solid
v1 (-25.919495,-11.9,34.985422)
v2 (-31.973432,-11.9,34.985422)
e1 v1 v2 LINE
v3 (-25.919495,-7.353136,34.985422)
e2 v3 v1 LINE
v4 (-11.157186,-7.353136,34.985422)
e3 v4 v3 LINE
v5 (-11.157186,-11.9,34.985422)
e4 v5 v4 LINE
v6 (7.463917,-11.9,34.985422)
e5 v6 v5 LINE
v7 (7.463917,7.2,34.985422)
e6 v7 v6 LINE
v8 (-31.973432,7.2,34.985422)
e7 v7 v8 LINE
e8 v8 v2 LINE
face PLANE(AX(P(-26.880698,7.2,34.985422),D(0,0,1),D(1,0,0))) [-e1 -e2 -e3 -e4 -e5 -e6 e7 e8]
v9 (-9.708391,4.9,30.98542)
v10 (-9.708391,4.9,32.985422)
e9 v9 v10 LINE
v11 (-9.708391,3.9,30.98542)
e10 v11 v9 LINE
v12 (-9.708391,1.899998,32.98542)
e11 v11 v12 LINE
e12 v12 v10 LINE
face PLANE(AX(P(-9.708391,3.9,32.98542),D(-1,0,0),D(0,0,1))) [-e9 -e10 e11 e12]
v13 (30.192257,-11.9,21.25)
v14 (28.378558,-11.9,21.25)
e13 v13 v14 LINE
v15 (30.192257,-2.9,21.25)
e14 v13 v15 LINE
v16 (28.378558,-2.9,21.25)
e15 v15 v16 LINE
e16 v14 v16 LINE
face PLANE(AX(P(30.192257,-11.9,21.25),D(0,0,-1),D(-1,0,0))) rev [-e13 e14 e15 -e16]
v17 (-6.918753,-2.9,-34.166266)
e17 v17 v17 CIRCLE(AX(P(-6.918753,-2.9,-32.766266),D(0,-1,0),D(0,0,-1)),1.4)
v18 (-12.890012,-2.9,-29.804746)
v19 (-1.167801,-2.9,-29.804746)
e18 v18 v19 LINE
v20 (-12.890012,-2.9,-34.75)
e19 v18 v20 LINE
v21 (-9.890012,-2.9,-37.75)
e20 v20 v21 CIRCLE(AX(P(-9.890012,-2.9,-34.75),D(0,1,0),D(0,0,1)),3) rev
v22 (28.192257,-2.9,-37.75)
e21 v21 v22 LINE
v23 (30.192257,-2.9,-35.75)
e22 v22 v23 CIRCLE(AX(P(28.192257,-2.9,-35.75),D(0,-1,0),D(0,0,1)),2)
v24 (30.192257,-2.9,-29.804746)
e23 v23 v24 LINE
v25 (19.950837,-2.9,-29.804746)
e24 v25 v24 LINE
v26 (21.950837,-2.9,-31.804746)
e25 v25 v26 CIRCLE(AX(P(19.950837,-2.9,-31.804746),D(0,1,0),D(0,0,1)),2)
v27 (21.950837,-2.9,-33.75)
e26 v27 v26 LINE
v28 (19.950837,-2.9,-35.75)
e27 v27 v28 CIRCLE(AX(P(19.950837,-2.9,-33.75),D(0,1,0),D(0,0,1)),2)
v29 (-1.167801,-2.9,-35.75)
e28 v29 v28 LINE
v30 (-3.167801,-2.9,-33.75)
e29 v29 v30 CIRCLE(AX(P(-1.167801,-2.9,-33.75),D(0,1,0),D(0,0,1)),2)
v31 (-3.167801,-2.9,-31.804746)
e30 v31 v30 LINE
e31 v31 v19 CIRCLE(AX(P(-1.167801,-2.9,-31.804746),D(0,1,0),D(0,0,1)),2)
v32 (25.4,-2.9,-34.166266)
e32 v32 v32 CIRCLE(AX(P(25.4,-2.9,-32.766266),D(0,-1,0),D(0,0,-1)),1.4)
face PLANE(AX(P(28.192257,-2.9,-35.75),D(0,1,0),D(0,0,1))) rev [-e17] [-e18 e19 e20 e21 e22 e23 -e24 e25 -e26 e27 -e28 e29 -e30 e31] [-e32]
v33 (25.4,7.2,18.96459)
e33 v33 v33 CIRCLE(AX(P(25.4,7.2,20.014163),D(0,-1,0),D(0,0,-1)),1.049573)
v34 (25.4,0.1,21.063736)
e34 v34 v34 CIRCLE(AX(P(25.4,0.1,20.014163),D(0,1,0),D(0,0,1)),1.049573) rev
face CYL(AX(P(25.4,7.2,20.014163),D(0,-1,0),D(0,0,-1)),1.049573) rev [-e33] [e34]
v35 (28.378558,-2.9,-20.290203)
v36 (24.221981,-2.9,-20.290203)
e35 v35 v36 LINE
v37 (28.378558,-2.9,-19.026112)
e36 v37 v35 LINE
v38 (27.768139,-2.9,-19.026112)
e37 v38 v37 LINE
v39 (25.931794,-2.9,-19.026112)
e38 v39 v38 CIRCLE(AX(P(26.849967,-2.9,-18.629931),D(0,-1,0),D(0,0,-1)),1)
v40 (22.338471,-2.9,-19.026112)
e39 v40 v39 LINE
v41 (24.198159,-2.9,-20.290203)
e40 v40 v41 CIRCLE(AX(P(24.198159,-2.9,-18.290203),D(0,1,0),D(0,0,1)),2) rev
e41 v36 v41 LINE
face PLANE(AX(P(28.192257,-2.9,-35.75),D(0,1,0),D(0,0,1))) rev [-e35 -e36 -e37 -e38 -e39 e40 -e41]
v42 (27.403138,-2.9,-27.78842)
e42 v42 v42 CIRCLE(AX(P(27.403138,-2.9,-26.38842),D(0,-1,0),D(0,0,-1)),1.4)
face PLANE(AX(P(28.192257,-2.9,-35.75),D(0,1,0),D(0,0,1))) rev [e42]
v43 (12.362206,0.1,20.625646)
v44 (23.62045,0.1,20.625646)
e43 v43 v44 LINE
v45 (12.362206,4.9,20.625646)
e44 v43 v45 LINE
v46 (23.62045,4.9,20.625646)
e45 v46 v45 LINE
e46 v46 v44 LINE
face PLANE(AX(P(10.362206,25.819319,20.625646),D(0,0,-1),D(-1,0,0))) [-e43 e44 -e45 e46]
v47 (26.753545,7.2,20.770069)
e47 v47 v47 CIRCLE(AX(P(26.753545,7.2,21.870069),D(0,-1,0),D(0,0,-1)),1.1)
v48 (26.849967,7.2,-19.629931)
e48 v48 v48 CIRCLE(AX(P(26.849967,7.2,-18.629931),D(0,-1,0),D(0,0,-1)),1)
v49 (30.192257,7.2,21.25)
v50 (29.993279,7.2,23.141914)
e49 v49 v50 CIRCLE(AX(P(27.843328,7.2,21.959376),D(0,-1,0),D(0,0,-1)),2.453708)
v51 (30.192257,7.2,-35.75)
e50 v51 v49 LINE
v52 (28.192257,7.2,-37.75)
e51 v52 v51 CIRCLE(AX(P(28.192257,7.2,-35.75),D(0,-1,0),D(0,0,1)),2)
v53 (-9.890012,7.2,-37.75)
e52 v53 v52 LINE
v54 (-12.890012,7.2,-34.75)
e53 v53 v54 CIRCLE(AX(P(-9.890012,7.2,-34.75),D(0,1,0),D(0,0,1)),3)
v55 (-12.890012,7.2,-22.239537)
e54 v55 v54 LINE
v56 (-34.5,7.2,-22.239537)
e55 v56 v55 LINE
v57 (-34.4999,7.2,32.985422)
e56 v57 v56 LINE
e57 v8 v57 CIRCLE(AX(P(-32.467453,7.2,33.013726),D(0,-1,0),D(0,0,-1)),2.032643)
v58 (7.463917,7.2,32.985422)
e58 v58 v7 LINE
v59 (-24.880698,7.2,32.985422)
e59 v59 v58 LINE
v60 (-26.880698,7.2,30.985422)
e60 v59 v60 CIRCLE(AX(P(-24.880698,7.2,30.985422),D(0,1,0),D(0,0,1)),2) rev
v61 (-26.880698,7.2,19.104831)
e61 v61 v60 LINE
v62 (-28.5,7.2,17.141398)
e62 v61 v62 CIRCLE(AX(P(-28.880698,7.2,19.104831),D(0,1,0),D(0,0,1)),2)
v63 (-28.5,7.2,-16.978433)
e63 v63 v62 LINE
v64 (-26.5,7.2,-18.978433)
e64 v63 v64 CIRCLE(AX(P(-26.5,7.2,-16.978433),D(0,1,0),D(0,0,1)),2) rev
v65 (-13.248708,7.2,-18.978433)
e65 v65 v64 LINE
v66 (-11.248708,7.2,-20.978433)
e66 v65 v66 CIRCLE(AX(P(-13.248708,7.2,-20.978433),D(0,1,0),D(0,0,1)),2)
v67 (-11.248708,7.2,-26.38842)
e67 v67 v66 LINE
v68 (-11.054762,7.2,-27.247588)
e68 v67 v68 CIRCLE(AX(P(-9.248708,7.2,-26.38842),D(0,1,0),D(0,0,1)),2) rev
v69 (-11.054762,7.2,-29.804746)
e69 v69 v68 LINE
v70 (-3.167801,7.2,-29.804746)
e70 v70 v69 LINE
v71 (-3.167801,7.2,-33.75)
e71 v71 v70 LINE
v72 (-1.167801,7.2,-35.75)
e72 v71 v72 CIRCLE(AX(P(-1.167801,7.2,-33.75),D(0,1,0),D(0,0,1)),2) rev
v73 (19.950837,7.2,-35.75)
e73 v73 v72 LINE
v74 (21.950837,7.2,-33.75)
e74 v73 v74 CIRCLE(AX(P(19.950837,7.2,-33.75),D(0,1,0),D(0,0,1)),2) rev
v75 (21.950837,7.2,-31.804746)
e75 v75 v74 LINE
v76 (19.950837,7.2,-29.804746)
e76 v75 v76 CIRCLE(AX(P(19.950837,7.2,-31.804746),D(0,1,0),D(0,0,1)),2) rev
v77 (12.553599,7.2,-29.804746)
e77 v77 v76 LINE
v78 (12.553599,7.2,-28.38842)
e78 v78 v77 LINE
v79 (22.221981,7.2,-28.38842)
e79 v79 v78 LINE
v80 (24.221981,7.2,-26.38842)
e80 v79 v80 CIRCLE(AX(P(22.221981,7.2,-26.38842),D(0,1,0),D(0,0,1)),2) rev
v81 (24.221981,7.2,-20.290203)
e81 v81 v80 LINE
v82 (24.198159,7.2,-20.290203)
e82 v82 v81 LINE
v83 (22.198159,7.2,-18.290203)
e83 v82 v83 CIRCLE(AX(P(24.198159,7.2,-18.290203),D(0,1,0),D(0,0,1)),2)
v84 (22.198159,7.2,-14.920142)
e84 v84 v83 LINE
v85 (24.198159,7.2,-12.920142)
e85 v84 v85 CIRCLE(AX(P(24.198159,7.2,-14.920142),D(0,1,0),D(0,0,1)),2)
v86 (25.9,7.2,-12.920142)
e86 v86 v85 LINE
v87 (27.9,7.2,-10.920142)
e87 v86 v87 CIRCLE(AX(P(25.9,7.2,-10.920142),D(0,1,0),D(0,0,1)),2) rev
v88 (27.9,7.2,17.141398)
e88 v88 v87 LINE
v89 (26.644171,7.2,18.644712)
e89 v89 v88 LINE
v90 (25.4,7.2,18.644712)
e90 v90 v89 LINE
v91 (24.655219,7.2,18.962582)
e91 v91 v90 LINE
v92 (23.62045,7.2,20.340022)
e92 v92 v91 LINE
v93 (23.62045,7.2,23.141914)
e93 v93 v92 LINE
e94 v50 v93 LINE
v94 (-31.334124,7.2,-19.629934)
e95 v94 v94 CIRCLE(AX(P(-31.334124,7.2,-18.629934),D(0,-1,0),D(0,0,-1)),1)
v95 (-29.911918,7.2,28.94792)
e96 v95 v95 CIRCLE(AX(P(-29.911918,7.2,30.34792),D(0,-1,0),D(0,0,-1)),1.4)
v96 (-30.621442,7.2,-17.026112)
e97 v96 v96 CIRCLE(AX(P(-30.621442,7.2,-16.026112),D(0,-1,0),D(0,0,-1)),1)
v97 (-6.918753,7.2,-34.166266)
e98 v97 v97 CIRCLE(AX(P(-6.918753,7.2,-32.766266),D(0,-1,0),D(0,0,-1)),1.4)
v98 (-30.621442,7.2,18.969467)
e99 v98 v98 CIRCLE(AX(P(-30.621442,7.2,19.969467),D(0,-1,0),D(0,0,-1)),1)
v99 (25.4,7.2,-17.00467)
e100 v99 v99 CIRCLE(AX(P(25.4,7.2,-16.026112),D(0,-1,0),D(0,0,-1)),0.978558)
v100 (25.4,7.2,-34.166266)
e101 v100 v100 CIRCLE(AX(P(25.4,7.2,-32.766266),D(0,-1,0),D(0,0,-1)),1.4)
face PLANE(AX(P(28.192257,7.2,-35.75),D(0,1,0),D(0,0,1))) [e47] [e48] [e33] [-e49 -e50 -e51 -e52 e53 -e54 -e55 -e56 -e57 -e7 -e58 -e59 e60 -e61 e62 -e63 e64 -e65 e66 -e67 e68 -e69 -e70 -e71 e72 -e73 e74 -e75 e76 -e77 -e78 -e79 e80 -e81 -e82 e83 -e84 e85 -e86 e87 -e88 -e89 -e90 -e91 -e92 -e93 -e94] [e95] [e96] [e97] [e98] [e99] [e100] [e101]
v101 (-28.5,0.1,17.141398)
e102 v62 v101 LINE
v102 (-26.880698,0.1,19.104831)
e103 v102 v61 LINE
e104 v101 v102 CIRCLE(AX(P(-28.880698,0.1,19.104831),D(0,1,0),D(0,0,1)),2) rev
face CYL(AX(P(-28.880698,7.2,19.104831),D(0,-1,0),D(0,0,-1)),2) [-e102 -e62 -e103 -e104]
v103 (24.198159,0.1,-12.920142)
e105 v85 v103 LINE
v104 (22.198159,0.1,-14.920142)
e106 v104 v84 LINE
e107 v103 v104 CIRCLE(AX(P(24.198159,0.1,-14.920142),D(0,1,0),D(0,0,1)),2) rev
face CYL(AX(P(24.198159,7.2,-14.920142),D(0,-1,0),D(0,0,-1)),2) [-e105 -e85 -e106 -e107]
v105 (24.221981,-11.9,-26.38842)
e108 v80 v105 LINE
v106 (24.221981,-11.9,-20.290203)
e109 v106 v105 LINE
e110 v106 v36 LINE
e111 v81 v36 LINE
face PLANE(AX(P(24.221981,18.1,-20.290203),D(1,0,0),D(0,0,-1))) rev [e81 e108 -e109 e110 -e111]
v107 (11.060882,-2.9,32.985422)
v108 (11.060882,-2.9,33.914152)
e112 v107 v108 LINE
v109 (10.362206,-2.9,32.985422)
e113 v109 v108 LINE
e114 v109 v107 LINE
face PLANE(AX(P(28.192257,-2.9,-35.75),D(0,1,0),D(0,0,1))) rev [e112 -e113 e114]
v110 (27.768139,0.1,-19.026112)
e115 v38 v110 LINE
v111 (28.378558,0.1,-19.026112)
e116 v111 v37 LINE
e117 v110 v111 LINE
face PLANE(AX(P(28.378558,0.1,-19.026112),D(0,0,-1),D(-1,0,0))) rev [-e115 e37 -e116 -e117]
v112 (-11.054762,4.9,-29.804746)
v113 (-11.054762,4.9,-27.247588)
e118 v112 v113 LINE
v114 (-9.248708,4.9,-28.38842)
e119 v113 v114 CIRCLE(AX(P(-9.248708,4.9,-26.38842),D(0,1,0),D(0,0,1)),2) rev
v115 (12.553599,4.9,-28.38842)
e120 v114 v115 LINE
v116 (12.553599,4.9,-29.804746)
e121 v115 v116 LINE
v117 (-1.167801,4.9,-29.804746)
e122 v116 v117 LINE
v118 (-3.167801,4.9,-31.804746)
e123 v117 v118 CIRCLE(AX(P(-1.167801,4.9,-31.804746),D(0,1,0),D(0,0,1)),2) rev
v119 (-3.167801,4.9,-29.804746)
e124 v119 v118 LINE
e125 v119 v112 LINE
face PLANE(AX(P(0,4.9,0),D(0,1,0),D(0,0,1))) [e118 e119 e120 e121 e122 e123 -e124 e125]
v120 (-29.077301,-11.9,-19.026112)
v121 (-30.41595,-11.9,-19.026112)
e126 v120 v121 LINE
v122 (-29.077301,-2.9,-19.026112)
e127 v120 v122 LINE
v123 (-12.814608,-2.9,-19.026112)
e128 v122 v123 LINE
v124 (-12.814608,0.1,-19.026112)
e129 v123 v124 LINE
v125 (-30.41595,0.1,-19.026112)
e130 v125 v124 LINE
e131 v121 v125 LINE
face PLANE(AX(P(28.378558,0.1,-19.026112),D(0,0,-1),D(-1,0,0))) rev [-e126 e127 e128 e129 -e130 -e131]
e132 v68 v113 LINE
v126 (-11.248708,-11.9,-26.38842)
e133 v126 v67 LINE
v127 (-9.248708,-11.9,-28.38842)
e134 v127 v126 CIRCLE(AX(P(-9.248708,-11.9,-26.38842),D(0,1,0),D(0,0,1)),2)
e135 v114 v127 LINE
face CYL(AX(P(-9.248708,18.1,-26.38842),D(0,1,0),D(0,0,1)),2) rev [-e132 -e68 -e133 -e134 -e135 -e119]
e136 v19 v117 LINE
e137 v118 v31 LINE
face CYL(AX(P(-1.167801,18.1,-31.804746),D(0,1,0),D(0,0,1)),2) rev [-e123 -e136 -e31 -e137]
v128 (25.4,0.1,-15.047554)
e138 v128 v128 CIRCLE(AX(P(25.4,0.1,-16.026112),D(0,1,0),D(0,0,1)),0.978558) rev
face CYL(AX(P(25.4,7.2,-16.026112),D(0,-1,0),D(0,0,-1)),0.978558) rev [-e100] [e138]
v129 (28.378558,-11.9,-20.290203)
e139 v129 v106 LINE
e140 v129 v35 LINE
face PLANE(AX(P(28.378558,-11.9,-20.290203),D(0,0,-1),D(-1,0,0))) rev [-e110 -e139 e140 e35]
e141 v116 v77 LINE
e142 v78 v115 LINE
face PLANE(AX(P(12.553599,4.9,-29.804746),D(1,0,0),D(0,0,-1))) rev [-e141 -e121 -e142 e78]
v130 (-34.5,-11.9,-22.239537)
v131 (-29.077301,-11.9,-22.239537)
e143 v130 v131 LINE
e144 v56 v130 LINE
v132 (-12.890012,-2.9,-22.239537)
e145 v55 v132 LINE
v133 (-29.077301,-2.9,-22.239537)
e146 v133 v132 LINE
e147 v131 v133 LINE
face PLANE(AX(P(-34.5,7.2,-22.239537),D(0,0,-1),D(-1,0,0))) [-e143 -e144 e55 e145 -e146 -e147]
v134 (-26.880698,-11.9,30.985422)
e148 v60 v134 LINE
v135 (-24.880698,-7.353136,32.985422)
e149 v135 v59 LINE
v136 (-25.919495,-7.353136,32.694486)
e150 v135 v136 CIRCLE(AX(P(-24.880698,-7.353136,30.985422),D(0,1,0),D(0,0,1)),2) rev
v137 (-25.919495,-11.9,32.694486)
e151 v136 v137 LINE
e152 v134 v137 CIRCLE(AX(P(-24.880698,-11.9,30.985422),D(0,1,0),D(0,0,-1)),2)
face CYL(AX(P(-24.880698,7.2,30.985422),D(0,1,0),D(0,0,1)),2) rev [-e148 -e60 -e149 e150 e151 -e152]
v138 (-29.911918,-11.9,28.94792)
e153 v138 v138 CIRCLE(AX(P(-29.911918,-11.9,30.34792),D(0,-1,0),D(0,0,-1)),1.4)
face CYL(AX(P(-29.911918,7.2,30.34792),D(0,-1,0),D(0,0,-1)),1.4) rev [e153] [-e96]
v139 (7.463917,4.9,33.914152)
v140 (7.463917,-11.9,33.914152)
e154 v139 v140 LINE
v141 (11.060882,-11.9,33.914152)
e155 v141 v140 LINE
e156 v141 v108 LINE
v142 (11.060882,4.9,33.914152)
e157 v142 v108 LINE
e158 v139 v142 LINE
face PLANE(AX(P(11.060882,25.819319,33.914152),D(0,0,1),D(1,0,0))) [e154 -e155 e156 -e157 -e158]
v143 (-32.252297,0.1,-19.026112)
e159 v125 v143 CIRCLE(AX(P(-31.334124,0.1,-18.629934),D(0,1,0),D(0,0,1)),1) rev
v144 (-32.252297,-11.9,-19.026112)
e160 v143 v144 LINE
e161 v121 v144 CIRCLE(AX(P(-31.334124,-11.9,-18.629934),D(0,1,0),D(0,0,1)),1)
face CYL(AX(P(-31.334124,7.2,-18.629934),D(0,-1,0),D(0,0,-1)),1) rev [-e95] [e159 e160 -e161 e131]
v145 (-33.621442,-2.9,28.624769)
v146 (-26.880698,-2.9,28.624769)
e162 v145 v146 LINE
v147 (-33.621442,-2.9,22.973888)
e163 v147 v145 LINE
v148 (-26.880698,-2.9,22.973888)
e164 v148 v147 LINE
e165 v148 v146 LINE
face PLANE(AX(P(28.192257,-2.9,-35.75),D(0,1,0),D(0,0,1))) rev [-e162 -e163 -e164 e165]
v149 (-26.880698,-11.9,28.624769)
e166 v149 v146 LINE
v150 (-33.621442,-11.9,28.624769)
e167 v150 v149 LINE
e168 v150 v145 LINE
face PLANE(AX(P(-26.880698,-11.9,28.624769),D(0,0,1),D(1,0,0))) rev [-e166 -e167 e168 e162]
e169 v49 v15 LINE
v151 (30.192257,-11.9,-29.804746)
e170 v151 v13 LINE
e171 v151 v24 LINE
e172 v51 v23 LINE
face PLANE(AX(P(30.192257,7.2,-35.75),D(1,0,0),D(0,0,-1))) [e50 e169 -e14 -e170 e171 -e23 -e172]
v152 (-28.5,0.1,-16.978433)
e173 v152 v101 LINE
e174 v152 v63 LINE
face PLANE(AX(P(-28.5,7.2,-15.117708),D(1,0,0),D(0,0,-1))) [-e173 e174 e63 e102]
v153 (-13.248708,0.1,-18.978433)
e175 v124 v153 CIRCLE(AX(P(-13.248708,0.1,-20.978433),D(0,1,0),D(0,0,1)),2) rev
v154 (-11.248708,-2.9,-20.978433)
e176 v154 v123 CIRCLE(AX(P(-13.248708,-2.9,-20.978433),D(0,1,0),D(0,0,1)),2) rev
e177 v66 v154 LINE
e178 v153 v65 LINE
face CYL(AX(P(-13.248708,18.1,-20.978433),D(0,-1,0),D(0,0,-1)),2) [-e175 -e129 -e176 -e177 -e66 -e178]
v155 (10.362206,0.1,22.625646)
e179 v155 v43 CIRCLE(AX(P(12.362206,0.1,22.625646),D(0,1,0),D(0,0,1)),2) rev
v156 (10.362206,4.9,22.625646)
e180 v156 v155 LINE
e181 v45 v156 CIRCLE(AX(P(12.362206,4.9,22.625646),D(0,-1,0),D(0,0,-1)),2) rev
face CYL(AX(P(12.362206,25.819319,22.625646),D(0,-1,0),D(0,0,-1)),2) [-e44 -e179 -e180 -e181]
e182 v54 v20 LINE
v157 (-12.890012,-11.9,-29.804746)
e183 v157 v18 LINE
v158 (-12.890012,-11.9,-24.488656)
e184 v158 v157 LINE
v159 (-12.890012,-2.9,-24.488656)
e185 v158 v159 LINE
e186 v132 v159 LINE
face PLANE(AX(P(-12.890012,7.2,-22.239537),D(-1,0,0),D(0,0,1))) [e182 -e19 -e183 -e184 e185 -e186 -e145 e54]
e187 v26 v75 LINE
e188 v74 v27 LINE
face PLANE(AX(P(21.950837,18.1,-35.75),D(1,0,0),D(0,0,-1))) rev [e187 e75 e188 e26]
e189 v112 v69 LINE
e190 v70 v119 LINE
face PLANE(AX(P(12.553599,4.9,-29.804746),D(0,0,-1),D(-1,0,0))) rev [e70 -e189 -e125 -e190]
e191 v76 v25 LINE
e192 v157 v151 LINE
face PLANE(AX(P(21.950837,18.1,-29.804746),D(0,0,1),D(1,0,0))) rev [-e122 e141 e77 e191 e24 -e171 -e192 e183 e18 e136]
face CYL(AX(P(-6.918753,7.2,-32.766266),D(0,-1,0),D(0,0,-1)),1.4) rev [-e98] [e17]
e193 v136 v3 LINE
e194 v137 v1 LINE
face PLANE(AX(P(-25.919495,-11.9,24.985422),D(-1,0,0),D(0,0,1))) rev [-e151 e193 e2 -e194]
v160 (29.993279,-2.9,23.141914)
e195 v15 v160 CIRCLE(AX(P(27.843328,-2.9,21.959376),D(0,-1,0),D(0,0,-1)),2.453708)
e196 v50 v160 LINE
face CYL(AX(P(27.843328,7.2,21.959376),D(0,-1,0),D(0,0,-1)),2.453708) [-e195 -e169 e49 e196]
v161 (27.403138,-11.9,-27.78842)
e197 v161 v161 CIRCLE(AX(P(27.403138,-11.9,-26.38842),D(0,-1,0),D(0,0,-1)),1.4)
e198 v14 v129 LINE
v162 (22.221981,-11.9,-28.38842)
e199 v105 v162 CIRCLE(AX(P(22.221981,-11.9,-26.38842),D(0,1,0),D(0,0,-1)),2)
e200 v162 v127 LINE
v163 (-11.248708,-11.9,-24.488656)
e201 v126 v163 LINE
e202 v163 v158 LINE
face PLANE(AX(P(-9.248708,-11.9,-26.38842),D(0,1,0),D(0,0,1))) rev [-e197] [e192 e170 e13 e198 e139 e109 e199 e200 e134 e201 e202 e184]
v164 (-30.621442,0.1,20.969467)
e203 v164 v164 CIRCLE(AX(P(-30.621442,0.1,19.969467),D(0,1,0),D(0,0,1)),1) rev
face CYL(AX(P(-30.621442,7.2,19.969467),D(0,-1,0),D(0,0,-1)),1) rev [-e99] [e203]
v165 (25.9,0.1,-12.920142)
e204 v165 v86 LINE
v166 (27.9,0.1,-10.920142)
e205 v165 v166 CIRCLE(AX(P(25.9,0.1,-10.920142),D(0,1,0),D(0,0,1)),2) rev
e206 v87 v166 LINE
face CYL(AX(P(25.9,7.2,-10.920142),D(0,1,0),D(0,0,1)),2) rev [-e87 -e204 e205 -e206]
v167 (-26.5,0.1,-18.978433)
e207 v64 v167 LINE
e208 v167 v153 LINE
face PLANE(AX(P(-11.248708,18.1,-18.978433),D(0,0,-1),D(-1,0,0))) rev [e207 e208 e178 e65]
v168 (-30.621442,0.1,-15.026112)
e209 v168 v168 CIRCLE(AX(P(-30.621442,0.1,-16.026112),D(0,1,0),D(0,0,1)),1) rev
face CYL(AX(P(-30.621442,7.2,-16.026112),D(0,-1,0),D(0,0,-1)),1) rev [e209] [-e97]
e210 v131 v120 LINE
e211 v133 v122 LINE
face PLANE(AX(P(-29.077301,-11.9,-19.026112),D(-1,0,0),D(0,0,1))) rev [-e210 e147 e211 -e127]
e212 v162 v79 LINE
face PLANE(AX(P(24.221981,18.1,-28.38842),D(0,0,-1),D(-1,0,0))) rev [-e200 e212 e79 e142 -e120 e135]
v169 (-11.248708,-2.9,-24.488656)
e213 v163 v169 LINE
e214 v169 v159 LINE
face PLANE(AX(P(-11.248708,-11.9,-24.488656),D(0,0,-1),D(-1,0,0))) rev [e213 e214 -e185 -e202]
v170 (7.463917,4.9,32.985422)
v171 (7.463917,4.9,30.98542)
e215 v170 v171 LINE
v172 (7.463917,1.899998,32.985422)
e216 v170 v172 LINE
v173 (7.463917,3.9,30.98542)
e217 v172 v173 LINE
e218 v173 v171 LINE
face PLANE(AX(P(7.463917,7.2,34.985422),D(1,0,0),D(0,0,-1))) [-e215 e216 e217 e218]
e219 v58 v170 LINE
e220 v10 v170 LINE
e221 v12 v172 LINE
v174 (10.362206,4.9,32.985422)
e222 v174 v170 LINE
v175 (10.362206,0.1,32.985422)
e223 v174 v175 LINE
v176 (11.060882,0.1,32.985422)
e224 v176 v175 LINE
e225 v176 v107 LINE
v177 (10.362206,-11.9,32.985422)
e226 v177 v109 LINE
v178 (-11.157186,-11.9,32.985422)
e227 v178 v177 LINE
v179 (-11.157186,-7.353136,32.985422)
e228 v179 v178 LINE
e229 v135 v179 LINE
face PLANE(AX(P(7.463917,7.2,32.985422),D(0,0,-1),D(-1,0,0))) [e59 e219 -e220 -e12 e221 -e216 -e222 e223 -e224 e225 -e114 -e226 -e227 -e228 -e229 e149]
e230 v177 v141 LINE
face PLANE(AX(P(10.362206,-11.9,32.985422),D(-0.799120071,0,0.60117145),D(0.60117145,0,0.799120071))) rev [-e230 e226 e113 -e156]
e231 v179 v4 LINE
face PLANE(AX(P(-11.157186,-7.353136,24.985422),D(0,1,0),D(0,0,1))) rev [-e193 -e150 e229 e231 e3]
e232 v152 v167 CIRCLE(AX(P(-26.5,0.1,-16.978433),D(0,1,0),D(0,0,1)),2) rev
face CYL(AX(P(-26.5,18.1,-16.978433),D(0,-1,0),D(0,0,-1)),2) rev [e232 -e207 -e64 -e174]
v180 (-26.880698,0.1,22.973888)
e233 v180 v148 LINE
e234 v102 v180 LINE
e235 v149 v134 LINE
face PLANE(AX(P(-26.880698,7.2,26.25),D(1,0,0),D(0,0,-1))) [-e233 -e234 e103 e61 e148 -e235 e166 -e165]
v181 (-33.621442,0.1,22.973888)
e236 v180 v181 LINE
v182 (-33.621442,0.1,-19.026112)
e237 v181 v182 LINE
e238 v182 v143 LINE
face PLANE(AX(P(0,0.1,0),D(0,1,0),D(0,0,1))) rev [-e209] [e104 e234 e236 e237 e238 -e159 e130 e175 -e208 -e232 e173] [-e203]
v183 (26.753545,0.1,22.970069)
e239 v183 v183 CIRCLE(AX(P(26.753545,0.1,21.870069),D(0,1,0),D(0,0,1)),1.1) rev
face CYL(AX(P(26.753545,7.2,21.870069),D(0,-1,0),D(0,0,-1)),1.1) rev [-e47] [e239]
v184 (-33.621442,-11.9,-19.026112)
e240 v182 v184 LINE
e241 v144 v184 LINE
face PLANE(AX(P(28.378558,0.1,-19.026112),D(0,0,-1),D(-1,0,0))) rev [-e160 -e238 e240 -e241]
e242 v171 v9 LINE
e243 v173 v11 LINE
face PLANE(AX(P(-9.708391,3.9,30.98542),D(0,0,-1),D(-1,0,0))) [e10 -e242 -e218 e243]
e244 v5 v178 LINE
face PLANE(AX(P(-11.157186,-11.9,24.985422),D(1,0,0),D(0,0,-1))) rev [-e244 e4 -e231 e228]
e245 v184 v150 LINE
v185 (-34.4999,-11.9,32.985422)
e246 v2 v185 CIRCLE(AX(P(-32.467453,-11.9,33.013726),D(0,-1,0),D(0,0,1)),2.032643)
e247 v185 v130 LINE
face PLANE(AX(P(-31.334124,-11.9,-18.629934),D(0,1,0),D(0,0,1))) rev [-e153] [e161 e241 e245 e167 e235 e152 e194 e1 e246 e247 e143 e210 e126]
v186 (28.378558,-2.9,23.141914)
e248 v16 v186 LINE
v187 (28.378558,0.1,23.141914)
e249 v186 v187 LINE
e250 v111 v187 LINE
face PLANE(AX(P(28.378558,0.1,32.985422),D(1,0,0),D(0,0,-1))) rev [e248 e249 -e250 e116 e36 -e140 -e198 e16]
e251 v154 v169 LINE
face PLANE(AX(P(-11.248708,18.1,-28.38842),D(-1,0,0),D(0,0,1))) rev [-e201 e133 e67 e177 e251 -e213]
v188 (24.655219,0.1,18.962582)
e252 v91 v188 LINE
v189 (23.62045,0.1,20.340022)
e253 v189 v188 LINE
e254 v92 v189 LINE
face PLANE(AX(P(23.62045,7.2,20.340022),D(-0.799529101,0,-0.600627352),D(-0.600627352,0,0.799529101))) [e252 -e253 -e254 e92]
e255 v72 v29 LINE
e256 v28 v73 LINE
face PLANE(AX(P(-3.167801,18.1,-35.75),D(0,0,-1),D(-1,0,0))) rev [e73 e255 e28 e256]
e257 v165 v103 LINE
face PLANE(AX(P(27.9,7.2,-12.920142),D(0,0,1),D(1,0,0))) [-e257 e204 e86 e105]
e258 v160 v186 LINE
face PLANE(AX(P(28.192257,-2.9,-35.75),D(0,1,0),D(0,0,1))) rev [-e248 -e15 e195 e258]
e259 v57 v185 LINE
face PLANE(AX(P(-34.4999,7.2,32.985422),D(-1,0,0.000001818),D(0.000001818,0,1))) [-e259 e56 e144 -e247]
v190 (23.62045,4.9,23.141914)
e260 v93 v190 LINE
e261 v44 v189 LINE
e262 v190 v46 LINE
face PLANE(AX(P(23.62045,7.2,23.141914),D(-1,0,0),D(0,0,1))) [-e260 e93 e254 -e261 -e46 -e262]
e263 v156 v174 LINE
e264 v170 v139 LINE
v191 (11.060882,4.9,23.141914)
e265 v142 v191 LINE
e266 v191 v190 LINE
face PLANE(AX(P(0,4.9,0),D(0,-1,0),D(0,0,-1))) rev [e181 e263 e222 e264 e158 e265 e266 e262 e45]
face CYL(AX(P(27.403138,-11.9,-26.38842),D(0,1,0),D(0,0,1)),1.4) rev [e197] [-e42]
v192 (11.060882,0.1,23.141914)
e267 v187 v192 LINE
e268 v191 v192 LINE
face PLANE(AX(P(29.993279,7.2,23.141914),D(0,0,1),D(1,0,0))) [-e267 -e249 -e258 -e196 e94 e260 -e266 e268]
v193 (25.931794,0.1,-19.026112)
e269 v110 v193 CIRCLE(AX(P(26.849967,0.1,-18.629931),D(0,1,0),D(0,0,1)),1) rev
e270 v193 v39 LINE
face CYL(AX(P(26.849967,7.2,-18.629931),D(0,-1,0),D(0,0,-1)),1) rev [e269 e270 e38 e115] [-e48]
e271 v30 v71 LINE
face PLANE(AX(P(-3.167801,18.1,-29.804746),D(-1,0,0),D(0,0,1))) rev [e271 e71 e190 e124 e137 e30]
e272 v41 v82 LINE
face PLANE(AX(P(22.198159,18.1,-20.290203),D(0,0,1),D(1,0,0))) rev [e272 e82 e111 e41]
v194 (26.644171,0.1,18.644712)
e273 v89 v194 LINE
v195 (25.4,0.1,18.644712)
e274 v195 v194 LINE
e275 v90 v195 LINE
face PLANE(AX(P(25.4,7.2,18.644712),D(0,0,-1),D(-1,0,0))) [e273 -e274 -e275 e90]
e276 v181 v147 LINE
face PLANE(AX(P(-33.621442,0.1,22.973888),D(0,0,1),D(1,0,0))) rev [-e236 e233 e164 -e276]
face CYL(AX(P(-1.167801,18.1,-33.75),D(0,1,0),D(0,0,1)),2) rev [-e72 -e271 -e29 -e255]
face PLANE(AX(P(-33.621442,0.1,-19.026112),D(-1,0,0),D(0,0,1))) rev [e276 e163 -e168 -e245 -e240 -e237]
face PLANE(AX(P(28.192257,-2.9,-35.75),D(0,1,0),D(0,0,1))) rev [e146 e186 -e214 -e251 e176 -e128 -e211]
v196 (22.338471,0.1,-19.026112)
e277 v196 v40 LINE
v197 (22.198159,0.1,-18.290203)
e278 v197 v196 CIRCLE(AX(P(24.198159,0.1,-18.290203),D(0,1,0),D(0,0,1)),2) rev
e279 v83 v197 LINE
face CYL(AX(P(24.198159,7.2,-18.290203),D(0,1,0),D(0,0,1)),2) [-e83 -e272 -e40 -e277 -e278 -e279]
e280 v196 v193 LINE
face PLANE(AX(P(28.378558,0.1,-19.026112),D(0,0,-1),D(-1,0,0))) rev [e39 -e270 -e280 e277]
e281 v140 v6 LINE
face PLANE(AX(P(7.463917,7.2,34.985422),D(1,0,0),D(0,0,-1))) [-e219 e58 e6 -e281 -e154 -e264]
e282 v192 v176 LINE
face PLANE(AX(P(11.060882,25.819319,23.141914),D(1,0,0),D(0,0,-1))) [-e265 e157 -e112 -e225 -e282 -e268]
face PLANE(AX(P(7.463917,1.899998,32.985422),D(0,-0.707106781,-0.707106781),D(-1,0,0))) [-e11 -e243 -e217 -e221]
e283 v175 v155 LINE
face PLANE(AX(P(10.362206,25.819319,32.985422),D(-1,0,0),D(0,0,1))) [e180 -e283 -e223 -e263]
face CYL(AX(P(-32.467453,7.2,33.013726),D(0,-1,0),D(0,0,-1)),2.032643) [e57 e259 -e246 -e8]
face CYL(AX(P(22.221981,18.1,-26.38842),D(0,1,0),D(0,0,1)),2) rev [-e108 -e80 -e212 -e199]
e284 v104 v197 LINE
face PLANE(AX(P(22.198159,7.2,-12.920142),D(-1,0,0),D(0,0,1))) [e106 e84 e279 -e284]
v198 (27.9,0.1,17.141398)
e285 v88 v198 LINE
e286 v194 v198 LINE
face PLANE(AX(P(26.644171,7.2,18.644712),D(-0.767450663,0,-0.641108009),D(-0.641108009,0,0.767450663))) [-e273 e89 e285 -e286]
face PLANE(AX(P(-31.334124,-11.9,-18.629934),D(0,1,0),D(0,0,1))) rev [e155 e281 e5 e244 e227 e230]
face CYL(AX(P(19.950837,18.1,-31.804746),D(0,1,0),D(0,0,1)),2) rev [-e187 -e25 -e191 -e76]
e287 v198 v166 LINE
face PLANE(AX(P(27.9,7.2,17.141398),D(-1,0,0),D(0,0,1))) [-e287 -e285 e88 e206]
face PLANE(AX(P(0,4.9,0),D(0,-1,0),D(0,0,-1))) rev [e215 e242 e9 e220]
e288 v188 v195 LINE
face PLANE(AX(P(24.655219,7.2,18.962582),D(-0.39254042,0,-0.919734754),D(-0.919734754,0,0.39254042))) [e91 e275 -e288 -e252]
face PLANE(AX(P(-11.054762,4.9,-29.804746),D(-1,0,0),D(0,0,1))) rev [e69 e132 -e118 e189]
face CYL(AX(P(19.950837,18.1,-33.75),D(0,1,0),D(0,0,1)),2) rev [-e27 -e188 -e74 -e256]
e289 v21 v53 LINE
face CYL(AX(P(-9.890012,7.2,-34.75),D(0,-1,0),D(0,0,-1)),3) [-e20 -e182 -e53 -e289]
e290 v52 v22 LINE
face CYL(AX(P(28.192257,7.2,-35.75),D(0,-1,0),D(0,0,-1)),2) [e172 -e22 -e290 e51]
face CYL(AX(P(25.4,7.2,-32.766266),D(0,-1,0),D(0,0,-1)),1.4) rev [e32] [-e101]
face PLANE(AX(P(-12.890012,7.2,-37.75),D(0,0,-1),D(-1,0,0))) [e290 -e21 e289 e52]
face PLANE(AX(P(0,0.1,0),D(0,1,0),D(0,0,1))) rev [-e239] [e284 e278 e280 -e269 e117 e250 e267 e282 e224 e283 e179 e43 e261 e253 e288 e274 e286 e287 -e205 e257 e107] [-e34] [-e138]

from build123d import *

# Parameters (mm, degrees)
BOSS_EXTRUDE1_DEPTH      = 3
BOSS_EXTRUDE1_DEPTH_BACK = 7.1
SKETCH1_R                = 1.4
SKETCH1_R_2              = 0.978558249
SKETCH1_R_3              = 1
SKETCH1_R_4              = 1.049573222
SKETCH1_R_5              = 1.1
SKETCH2_W                = 34.344615539
SKETCH2_H                = 2
BOSS_EXTRUDE2_DEPTH      = 10.1
BOSS_EXTRUDE5_START      = -2.3
SKETCH5_W                = 17.17230807
SKETCH5_H                = 2.00000017
BOSS_EXTRUDE5_DEPTH      = 1
CHAMFER2_SIZE            = 2
SKETCH7_W                = 25.118637785
SKETCH7_H                = 5.945254228
CUT_EXTRUDE1_DEPTH       = 21
SKETCH6_W                = 23.608360471
SKETCH6_H                = 2.652979876
CUT_EXTRUDE2_DEPTH       = 2.3
BOSS_EXTRUDE6_DEPTH      = 7.8
FILLET1_R                = 2
FILLET2_R                = 3
CUT_EXTRUDE3_DEPTH       = 3
SKETCH10_R               = 1.4
BOSS_EXTRUDE7_DEPTH      = 9
SKETCH11_W               = 14.76230902
SKETCH11_H               = 4.546864221
CUT_EXTRUDE4_DEPTH       = 10


with BuildPart() as part:
    # Sketch1 → Boss-Extrude1 (new, two sides: drawn at the far end of the back side and taken through both)
    with BuildSketch(Plane.XZ.offset(-0.1).offset(-BOSS_EXTRUDE1_DEPTH_BACK)):
        with BuildLine():
            Line((30.192257213, -35.75), (30.192257213, 21.25))
            ThreePointArc((30.192257213, 21.25), (30.283576859, 22.216024976), (29.993278542, 23.141913964))
            Line((29.993278542, 23.141913964), (23.620449619, 23.141913964))
            Line((23.620449619, 23.141913964), (23.620449619, 20.340022289))
            Line((23.620449619, 20.340022289), (24.655218734, 18.962582489))
            Line((24.655218734, 18.962582489), (25.4, 18.644711766))
            Line((25.4, 18.644711766), (26.644171144, 18.644711766))
            Line((26.644171144, 18.644711766), (27.9, 17.141397699))
            Line((27.9, 17.141397699), (27.9, -12.920142307))
            Line((27.9, -12.920142307), (22.198159173, -12.920142307))
            Line((22.198159173, -12.920142307), (22.198159173, -15.117708335))
            Line((22.198159173, -15.117708335), (-28.5, -15.117708335))
            Line((-28.5, -15.117708335), (-28.5, 17.141397699))
            Line((-28.5, 17.141397699), (-26.880698351, 17.141397699))
            Line((-26.880698351, 17.141397699), (-26.880698351, 26.25))
            Line((-26.880698351, 26.25), (-26.880698351, 34.985421621))
            Line((-26.880698351, 34.985421621), (-31.97343168, 34.985421621))
            ThreePointArc((-31.97343168, 34.985421621), (-33.729074299, 34.607448962), (-34.499899598, 32.985421621))
            Line((-34.499899598, 32.985421621), (-34.5, -22.239537014))
            Line((-34.5, -22.239537014), (-12.890012318, -22.239537014))
            Line((-12.890012318, -22.239537014), (-12.890012318, -37.75))
            Line((-12.890012318, -37.75), (28.19225721, -37.75))
            ThreePointArc((28.19225721, -37.75), (29.606470774, -37.164213563), (30.192257213, -35.75))
        make_face()
        with Locations(Location((25.4, -32.76626587, 0), (0, 0, 270))):
            Circle(SKETCH1_R, mode=Mode.SUBTRACT)
        with Locations(Location((-6.918752516, -32.76626587, 0), (0, 0, 270))):
            Circle(SKETCH1_R, mode=Mode.SUBTRACT)
        with Locations(Location((-29.911917882, 30.347920192, 0), (0, 0, 270))):
            Circle(SKETCH1_R, mode=Mode.SUBTRACT)
        with Locations(Location((25.4, -16.026111839, 0), (0, 0, 270))):
            Circle(SKETCH1_R_2, mode=Mode.SUBTRACT)
        with Locations(Location((-30.621441751, -16.026111839, 0), (0, 0, 270))):
            Circle(SKETCH1_R_3, mode=Mode.SUBTRACT)
        with Locations(Location((25.4, 20.014162826, 0), (0, 0, 270))):
            Circle(SKETCH1_R_4, mode=Mode.SUBTRACT)
        with Locations(Location((-30.621441751, 19.969466566, 0), (0, 0, 270))):
            Circle(SKETCH1_R_3, mode=Mode.SUBTRACT)
        with Locations(Location((26.849966888, -18.629931237, 0), (0, 0, 270))):
            Circle(SKETCH1_R_3, mode=Mode.SUBTRACT)
        with Locations(Location((-31.334123652, -18.629933616, 0), (0, 0, 270))):
            Circle(SKETCH1_R_3, mode=Mode.SUBTRACT)
        with Locations(Location((26.753545245, 21.870068845, 0), (0, 0, 270))):
            Circle(SKETCH1_R_5, mode=Mode.SUBTRACT)
    extrude(amount=BOSS_EXTRUDE1_DEPTH + BOSS_EXTRUDE1_DEPTH_BACK)

    # Sketch2 → Boss-Extrude2 (add)
    with BuildSketch(Plane.XZ.offset(2.9)):
        with Locations((-9.708390582, 33.985421621)):
            Rectangle(SKETCH2_W, SKETCH2_H)
    extrude(amount=-BOSS_EXTRUDE2_DEPTH)


with BuildPart() as boss_extrude5_tool:
    # Sketch5 → Boss-Extrude5 (new body)
    with BuildSketch(Plane(origin=(0, 7.2, 0), x_dir=(1, 0, 0), z_dir=(0, 1, 0)).offset(BOSS_EXTRUDE5_START)):
        with Locations((-1.122236547, -31.985419928)):
            Rectangle(SKETCH5_W, SKETCH5_H)
    extrude(amount=-BOSS_EXTRUDE5_DEPTH)


with BuildPart() as part_1:
    add(part.part)


with BuildPart() as part_2:
    # Boss-Extrude5: joined with boss_extrude5_tool
    add(part_1.part.fuse(boss_extrude5_tool.part, tol=0.00001))

    # Chamfer2
    chamfer2_edges = [part_2.edges().sort_by_distance(p)[0] for p in [
        (-1.122236547, 3.9, 32.985420013),
    ]]
    chamfer(chamfer2_edges, length=CHAMFER2_SIZE)

    # Sketch7 → Cut-Extrude1 (cut)
    with BuildSketch(Plane.XZ.offset(2.9)):
        Polygon((22.198159173, -15.117708335), (22.198159173, -20.290203117), (24.221980839, -20.290203117), (24.221980839, -28.38841979), (-11.248708011, -28.38841979), (-11.248708011, -18.978432706), (-28.5, -18.978432706), (-28.5, -15.117708335), align=None)
        with Locations((9.391518078, -32.777372884)):
            Rectangle(SKETCH7_W, SKETCH7_H)
    extrude(amount=-CUT_EXTRUDE1_DEPTH, mode=Mode.SUBTRACT)

    # Sketch6 → Cut-Extrude2 (cut)
    with BuildSketch(Plane(origin=(0, 7.2, 0), x_dir=(1, 0, 0), z_dir=(0, 1, 0))):
        with Locations((0.749418639, 28.478255832)):
            Rectangle(SKETCH6_W, SKETCH6_H)
    extrude(amount=-CUT_EXTRUDE2_DEPTH, mode=Mode.SUBTRACT)

    # Sketch8 → Boss-Extrude6 (add)
    with BuildSketch(Plane.XZ.offset(2.9)):
        Polygon((23.620449619, 23.141913964), (11.06088169, 23.141913964), (11.06088169, 33.914151599), (7.463917188, 33.914151599), (7.463917188, 32.985421621), (10.362205773, 32.985421621), (10.362205773, 20.625646), (23.620449619, 20.625646), align=None)
    extrude(amount=-BOSS_EXTRUDE6_DEPTH)

    # Fillet1
    # the kernel refuses this fillet: 2 mm, written as the material it adds along each edge
    with BuildSketch(Plane(origin=(-28.5, -2.9, -18.978432706), x_dir=(1, 0, 0), z_dir=(0, 1, 0)), Plane(origin=(21.95083697, -2.9, -29.80474577), x_dir=(-1, 0, 0), z_dir=(0, 1, 0)), Plane(origin=(-3.167800815, -2.9, -35.749999998), x_dir=(1, 0, 0), z_dir=(0, 1, 0)), Plane(origin=(21.95083697, -2.9, -35.749999998), x_dir=(0, 0, 1), z_dir=(0, 1, 0)), Plane(origin=(24.221980839, -2.9, -28.38841979), x_dir=(0, 0, 1), z_dir=(0, 1, 0))) as fillet1_piece_1:
        with BuildLine():
            CenterArc((FILLET1_R, -FILLET1_R), FILLET1_R, 90, 90)
            Line((0, -FILLET1_R), (0, 0))
            Line((0, 0), (FILLET1_R, 0))
        make_face()
    extrude(amount=10.1)
    with BuildSketch(Plane(origin=(-3.167800815, -2.9, -29.80474577), x_dir=(1, 0, 0), z_dir=(0, 1, 0))) as fillet1_piece_2:
        with BuildLine():
            CenterArc((FILLET1_R, FILLET1_R), FILLET1_R, 180, 90)
            Line((0, FILLET1_R), (0, 0))
            Line((0, 0), (FILLET1_R, 0))
        make_face()
    extrude(amount=7.8)
    with BuildSketch(Plane(origin=(-11.248708011, -2.9, -28.38841979), x_dir=(1, 0, 0), z_dir=(0, 1, 0))) as fillet1_piece_3_section:
        with BuildLine():
            CenterArc((FILLET1_R, -FILLET1_R), FILLET1_R, 90, 90)
            Line((0, -FILLET1_R), (0, 0))
            Line((0, 0), (FILLET1_R, 0))
        make_face()
    fillet1_piece_3 = extrude(amount=15.1, mode=Mode.PRIVATE)
    fillet1_piece_3 = split(fillet1_piece_3, bisect_by=Plane(origin=(-11.248708011, 4.9, -28.38841979), z_dir=(0, -1, 0)), keep=Keep.TOP, mode=Mode.PRIVATE)
    add(fillet1_piece_3)
    with BuildSketch(Plane(origin=(-11.248708011, -2.9, -28.38841979), x_dir=(1, 0, 0), z_dir=(0, 1, 0))) as fillet1_piece_4_section:
        with BuildLine():
            CenterArc((FILLET1_R, -FILLET1_R), FILLET1_R, 90, 90)
            Line((0, -FILLET1_R), (0, 0))
            Line((0, 0), (FILLET1_R, 0))
        make_face()
    fillet1_piece_4 = extrude(amount=10.1, mode=Mode.PRIVATE)
    fillet1_piece_4 = split(fillet1_piece_4, bisect_by=Plane(origin=(-11.054761596, -2.9, -28.38841979), z_dir=(-1, 0, 0)), keep=Keep.TOP, mode=Mode.PRIVATE)
    add(fillet1_piece_4)
    with BuildSketch(Plane(origin=(-26.880698351, -2.9, 32.985421621), x_dir=(1, 0, 0), z_dir=(0, 1, 0)), Plane(origin=(27.9, 7.2, -12.920142307), x_dir=(0, 0, 1), z_dir=(0, -1, 0))) as fillet1_piece_5:
        with BuildLine():
            CenterArc((FILLET1_R, FILLET1_R), FILLET1_R, 180, 90)
            Line((0, FILLET1_R), (0, 0))
            Line((0, 0), (FILLET1_R, 0))
        make_face()
    extrude(amount=10.1)
    # the kernel refuses this fillet: 2 mm, written as the material it takes off along each edge
    with BuildSketch(Plane(origin=(22.198159173, -7.9, -20.290203117), x_dir=(0, 0, 1), z_dir=(0, 1, 0)), Plane(origin=(-11.248708011, -7.9, -18.978432706), x_dir=(0, 0, -1), z_dir=(0, 1, 0))) as fillet1_2_piece_1:
        with BuildLine():
            CenterArc((FILLET1_R, FILLET1_R), FILLET1_R, 180, 90)
            Line((0, FILLET1_R), (0, 0))
            Line((0, 0), (FILLET1_R, 0))
        make_face()
    extrude(amount=20.1, mode=Mode.SUBTRACT)
    with BuildSketch(Plane(origin=(-26.880698351, 12.108582258, 17.141397699), x_dir=(-1, 0, 0), z_dir=(0, -1, 0))) as fillet1_2_piece_2:
        with BuildLine():
            CenterArc((2, -1.963432903), FILLET1_R, 100.973162392, 79.026837608)
            Line((0, -1.963432903), (0, 0))
            Line((0, 0), (1.619301649, 0))
        make_face()
    extrude(amount=19.917164516, mode=Mode.SUBTRACT)
    with BuildSketch(Plane(origin=(10.362205773, -7.9, 20.625646), x_dir=(1, 0, 0), z_dir=(0, 1, 0))) as fillet1_2_piece_3:
        with BuildLine():
            CenterArc((FILLET1_R, -FILLET1_R), FILLET1_R, 90, 90)
            Line((0, -FILLET1_R), (0, 0))
            Line((0, 0), (FILLET1_R, 0))
        make_face()
    extrude(amount=17.8, mode=Mode.SUBTRACT)
    with BuildSketch(Plane(origin=(22.198159173, 12.2, -12.920142307), x_dir=(1, 0, 0), z_dir=(0, -1, 0))) as fillet1_2_piece_4:
        with BuildLine():
            CenterArc((FILLET1_R, -FILLET1_R), FILLET1_R, 90, 90)
            Line((0, -FILLET1_R), (0, 0))
            Line((0, 0), (FILLET1_R, 0))
        make_face()
    extrude(amount=20.1, mode=Mode.SUBTRACT)

    # Fillet2
    fillet2_edges = [part_2.edges().sort_by_distance(p)[0] for p in [
        (-12.890012318, 2.15, -37.75),
    ]]
    fillet(fillet2_edges, radius=FILLET2_R)

    # Sketch9 → Cut-Extrude3 (cut)
    with BuildSketch(Plane.XZ.offset(2.9)):
        Polygon((-33.621441751, 22.973888161), (9.891803023, 22.973888161), (9.891803023, 32.985421621), (28.378558249, 32.985421621), (28.378558249, 22.973888161), (28.378558249, -19.026111839), (-33.621441751, -19.026111839), align=None)
    extrude(amount=-CUT_EXTRUDE3_DEPTH, mode=Mode.SUBTRACT)

    # Sketch10 → Boss-Extrude7 (add)
    # profile 1 of 2: a face of its own
    with BuildSketch(Plane.XZ.offset(2.9)):
        with BuildLine():
            Line((30.192257213, -29.80474577), (-12.890012318, -29.80474577))
            Line((-12.890012318, -29.80474577), (-12.890012318, -24.488656194))
            Line((-12.890012318, -24.488656194), (-11.248708011, -24.488656194))
            Line((-11.248708011, -24.488656194), (-11.248708011, -26.38841979))
            ThreePointArc((-11.248708011, -26.38841979), (-10.662921573, -27.802633352), (-9.248708011, -28.38841979))
            Line((-9.248708011, -28.38841979), (22.221980839, -28.38841979))
            ThreePointArc((22.221980839, -28.38841979), (23.636194402, -27.802633352), (24.221980839, -26.38841979))
            Line((24.221980839, -26.38841979), (24.221980839, -20.290203117))
            Line((24.221980839, -20.290203117), (28.378558249, -20.290203117))
            Line((28.378558249, -20.290203117), (28.378558249, 21.25))
            Line((28.378558249, 21.25), (30.192257213, 21.25))
            Line((30.192257213, 21.25), (30.192257213, -29.80474577))
        make_face()
        with Locations(Location((27.403137641, -26.38841979, 0), (0, 0, 270))):
            Circle(SKETCH10_R, mode=Mode.SUBTRACT)
    # profile 2 of 2: a face of its own
    with BuildSketch(Plane.XZ.offset(2.9)):
        with BuildLine():
            Line((-34.5, -22.239537014), (-34.499899598, 32.985421621))
            ThreePointArc((-34.499899598, 32.985421621), (-33.729074299, 34.607448962), (-31.97343168, 34.985421621))
            Line((-31.97343168, 34.985421621), (7.463917188, 34.985421621))
            Line((7.463917188, 34.985421621), (7.463917188, 33.914151599))
            Line((7.463917188, 33.914151599), (11.06088169, 33.914151599))
            Line((11.06088169, 33.914151599), (10.362205773, 32.985421621))
            Line((10.362205773, 32.985421621), (-24.880698351, 32.985421621))
            ThreePointArc((-24.880698351, 32.985421621), (-26.294911914, 32.399635183), (-26.880698351, 30.985421621))
            Line((-26.880698351, 30.985421621), (-26.880698351, 28.624768728))
            Line((-26.880698351, 28.624768728), (-33.621441751, 28.624768728))
            Line((-33.621441751, 28.624768728), (-33.621441751, -19.026111839))
            Line((-33.621441751, -19.026111839), (-32.252297283, -19.026111839))
            ThreePointArc((-32.252297283, -19.026111839), (-31.334123652, -19.629933616), (-30.415950022, -19.026111839))
            Line((-30.415950022, -19.026111839), (-29.077300846, -19.026111839))
            Line((-29.077300846, -19.026111839), (-29.077300846, -22.239537014))
            Line((-29.077300846, -22.239537014), (-34.5, -22.239537014))
        make_face()
        with Locations(Location((-29.911917882, 30.347920192, 0), (0, 0, 270))):
            Circle(SKETCH10_R, mode=Mode.SUBTRACT)
    extrude(amount=BOSS_EXTRUDE7_DEPTH)

    # Sketch11 → Cut-Extrude4 (cut)
    with BuildSketch(Plane.XY.offset(34.985421621)):
        with Locations((-18.538340522, -9.62656789)):
            Rectangle(SKETCH11_W, SKETCH11_H)
    extrude(amount=-CUT_EXTRUDE4_DEPTH, mode=Mode.SUBTRACT)


solid = part_2.part
